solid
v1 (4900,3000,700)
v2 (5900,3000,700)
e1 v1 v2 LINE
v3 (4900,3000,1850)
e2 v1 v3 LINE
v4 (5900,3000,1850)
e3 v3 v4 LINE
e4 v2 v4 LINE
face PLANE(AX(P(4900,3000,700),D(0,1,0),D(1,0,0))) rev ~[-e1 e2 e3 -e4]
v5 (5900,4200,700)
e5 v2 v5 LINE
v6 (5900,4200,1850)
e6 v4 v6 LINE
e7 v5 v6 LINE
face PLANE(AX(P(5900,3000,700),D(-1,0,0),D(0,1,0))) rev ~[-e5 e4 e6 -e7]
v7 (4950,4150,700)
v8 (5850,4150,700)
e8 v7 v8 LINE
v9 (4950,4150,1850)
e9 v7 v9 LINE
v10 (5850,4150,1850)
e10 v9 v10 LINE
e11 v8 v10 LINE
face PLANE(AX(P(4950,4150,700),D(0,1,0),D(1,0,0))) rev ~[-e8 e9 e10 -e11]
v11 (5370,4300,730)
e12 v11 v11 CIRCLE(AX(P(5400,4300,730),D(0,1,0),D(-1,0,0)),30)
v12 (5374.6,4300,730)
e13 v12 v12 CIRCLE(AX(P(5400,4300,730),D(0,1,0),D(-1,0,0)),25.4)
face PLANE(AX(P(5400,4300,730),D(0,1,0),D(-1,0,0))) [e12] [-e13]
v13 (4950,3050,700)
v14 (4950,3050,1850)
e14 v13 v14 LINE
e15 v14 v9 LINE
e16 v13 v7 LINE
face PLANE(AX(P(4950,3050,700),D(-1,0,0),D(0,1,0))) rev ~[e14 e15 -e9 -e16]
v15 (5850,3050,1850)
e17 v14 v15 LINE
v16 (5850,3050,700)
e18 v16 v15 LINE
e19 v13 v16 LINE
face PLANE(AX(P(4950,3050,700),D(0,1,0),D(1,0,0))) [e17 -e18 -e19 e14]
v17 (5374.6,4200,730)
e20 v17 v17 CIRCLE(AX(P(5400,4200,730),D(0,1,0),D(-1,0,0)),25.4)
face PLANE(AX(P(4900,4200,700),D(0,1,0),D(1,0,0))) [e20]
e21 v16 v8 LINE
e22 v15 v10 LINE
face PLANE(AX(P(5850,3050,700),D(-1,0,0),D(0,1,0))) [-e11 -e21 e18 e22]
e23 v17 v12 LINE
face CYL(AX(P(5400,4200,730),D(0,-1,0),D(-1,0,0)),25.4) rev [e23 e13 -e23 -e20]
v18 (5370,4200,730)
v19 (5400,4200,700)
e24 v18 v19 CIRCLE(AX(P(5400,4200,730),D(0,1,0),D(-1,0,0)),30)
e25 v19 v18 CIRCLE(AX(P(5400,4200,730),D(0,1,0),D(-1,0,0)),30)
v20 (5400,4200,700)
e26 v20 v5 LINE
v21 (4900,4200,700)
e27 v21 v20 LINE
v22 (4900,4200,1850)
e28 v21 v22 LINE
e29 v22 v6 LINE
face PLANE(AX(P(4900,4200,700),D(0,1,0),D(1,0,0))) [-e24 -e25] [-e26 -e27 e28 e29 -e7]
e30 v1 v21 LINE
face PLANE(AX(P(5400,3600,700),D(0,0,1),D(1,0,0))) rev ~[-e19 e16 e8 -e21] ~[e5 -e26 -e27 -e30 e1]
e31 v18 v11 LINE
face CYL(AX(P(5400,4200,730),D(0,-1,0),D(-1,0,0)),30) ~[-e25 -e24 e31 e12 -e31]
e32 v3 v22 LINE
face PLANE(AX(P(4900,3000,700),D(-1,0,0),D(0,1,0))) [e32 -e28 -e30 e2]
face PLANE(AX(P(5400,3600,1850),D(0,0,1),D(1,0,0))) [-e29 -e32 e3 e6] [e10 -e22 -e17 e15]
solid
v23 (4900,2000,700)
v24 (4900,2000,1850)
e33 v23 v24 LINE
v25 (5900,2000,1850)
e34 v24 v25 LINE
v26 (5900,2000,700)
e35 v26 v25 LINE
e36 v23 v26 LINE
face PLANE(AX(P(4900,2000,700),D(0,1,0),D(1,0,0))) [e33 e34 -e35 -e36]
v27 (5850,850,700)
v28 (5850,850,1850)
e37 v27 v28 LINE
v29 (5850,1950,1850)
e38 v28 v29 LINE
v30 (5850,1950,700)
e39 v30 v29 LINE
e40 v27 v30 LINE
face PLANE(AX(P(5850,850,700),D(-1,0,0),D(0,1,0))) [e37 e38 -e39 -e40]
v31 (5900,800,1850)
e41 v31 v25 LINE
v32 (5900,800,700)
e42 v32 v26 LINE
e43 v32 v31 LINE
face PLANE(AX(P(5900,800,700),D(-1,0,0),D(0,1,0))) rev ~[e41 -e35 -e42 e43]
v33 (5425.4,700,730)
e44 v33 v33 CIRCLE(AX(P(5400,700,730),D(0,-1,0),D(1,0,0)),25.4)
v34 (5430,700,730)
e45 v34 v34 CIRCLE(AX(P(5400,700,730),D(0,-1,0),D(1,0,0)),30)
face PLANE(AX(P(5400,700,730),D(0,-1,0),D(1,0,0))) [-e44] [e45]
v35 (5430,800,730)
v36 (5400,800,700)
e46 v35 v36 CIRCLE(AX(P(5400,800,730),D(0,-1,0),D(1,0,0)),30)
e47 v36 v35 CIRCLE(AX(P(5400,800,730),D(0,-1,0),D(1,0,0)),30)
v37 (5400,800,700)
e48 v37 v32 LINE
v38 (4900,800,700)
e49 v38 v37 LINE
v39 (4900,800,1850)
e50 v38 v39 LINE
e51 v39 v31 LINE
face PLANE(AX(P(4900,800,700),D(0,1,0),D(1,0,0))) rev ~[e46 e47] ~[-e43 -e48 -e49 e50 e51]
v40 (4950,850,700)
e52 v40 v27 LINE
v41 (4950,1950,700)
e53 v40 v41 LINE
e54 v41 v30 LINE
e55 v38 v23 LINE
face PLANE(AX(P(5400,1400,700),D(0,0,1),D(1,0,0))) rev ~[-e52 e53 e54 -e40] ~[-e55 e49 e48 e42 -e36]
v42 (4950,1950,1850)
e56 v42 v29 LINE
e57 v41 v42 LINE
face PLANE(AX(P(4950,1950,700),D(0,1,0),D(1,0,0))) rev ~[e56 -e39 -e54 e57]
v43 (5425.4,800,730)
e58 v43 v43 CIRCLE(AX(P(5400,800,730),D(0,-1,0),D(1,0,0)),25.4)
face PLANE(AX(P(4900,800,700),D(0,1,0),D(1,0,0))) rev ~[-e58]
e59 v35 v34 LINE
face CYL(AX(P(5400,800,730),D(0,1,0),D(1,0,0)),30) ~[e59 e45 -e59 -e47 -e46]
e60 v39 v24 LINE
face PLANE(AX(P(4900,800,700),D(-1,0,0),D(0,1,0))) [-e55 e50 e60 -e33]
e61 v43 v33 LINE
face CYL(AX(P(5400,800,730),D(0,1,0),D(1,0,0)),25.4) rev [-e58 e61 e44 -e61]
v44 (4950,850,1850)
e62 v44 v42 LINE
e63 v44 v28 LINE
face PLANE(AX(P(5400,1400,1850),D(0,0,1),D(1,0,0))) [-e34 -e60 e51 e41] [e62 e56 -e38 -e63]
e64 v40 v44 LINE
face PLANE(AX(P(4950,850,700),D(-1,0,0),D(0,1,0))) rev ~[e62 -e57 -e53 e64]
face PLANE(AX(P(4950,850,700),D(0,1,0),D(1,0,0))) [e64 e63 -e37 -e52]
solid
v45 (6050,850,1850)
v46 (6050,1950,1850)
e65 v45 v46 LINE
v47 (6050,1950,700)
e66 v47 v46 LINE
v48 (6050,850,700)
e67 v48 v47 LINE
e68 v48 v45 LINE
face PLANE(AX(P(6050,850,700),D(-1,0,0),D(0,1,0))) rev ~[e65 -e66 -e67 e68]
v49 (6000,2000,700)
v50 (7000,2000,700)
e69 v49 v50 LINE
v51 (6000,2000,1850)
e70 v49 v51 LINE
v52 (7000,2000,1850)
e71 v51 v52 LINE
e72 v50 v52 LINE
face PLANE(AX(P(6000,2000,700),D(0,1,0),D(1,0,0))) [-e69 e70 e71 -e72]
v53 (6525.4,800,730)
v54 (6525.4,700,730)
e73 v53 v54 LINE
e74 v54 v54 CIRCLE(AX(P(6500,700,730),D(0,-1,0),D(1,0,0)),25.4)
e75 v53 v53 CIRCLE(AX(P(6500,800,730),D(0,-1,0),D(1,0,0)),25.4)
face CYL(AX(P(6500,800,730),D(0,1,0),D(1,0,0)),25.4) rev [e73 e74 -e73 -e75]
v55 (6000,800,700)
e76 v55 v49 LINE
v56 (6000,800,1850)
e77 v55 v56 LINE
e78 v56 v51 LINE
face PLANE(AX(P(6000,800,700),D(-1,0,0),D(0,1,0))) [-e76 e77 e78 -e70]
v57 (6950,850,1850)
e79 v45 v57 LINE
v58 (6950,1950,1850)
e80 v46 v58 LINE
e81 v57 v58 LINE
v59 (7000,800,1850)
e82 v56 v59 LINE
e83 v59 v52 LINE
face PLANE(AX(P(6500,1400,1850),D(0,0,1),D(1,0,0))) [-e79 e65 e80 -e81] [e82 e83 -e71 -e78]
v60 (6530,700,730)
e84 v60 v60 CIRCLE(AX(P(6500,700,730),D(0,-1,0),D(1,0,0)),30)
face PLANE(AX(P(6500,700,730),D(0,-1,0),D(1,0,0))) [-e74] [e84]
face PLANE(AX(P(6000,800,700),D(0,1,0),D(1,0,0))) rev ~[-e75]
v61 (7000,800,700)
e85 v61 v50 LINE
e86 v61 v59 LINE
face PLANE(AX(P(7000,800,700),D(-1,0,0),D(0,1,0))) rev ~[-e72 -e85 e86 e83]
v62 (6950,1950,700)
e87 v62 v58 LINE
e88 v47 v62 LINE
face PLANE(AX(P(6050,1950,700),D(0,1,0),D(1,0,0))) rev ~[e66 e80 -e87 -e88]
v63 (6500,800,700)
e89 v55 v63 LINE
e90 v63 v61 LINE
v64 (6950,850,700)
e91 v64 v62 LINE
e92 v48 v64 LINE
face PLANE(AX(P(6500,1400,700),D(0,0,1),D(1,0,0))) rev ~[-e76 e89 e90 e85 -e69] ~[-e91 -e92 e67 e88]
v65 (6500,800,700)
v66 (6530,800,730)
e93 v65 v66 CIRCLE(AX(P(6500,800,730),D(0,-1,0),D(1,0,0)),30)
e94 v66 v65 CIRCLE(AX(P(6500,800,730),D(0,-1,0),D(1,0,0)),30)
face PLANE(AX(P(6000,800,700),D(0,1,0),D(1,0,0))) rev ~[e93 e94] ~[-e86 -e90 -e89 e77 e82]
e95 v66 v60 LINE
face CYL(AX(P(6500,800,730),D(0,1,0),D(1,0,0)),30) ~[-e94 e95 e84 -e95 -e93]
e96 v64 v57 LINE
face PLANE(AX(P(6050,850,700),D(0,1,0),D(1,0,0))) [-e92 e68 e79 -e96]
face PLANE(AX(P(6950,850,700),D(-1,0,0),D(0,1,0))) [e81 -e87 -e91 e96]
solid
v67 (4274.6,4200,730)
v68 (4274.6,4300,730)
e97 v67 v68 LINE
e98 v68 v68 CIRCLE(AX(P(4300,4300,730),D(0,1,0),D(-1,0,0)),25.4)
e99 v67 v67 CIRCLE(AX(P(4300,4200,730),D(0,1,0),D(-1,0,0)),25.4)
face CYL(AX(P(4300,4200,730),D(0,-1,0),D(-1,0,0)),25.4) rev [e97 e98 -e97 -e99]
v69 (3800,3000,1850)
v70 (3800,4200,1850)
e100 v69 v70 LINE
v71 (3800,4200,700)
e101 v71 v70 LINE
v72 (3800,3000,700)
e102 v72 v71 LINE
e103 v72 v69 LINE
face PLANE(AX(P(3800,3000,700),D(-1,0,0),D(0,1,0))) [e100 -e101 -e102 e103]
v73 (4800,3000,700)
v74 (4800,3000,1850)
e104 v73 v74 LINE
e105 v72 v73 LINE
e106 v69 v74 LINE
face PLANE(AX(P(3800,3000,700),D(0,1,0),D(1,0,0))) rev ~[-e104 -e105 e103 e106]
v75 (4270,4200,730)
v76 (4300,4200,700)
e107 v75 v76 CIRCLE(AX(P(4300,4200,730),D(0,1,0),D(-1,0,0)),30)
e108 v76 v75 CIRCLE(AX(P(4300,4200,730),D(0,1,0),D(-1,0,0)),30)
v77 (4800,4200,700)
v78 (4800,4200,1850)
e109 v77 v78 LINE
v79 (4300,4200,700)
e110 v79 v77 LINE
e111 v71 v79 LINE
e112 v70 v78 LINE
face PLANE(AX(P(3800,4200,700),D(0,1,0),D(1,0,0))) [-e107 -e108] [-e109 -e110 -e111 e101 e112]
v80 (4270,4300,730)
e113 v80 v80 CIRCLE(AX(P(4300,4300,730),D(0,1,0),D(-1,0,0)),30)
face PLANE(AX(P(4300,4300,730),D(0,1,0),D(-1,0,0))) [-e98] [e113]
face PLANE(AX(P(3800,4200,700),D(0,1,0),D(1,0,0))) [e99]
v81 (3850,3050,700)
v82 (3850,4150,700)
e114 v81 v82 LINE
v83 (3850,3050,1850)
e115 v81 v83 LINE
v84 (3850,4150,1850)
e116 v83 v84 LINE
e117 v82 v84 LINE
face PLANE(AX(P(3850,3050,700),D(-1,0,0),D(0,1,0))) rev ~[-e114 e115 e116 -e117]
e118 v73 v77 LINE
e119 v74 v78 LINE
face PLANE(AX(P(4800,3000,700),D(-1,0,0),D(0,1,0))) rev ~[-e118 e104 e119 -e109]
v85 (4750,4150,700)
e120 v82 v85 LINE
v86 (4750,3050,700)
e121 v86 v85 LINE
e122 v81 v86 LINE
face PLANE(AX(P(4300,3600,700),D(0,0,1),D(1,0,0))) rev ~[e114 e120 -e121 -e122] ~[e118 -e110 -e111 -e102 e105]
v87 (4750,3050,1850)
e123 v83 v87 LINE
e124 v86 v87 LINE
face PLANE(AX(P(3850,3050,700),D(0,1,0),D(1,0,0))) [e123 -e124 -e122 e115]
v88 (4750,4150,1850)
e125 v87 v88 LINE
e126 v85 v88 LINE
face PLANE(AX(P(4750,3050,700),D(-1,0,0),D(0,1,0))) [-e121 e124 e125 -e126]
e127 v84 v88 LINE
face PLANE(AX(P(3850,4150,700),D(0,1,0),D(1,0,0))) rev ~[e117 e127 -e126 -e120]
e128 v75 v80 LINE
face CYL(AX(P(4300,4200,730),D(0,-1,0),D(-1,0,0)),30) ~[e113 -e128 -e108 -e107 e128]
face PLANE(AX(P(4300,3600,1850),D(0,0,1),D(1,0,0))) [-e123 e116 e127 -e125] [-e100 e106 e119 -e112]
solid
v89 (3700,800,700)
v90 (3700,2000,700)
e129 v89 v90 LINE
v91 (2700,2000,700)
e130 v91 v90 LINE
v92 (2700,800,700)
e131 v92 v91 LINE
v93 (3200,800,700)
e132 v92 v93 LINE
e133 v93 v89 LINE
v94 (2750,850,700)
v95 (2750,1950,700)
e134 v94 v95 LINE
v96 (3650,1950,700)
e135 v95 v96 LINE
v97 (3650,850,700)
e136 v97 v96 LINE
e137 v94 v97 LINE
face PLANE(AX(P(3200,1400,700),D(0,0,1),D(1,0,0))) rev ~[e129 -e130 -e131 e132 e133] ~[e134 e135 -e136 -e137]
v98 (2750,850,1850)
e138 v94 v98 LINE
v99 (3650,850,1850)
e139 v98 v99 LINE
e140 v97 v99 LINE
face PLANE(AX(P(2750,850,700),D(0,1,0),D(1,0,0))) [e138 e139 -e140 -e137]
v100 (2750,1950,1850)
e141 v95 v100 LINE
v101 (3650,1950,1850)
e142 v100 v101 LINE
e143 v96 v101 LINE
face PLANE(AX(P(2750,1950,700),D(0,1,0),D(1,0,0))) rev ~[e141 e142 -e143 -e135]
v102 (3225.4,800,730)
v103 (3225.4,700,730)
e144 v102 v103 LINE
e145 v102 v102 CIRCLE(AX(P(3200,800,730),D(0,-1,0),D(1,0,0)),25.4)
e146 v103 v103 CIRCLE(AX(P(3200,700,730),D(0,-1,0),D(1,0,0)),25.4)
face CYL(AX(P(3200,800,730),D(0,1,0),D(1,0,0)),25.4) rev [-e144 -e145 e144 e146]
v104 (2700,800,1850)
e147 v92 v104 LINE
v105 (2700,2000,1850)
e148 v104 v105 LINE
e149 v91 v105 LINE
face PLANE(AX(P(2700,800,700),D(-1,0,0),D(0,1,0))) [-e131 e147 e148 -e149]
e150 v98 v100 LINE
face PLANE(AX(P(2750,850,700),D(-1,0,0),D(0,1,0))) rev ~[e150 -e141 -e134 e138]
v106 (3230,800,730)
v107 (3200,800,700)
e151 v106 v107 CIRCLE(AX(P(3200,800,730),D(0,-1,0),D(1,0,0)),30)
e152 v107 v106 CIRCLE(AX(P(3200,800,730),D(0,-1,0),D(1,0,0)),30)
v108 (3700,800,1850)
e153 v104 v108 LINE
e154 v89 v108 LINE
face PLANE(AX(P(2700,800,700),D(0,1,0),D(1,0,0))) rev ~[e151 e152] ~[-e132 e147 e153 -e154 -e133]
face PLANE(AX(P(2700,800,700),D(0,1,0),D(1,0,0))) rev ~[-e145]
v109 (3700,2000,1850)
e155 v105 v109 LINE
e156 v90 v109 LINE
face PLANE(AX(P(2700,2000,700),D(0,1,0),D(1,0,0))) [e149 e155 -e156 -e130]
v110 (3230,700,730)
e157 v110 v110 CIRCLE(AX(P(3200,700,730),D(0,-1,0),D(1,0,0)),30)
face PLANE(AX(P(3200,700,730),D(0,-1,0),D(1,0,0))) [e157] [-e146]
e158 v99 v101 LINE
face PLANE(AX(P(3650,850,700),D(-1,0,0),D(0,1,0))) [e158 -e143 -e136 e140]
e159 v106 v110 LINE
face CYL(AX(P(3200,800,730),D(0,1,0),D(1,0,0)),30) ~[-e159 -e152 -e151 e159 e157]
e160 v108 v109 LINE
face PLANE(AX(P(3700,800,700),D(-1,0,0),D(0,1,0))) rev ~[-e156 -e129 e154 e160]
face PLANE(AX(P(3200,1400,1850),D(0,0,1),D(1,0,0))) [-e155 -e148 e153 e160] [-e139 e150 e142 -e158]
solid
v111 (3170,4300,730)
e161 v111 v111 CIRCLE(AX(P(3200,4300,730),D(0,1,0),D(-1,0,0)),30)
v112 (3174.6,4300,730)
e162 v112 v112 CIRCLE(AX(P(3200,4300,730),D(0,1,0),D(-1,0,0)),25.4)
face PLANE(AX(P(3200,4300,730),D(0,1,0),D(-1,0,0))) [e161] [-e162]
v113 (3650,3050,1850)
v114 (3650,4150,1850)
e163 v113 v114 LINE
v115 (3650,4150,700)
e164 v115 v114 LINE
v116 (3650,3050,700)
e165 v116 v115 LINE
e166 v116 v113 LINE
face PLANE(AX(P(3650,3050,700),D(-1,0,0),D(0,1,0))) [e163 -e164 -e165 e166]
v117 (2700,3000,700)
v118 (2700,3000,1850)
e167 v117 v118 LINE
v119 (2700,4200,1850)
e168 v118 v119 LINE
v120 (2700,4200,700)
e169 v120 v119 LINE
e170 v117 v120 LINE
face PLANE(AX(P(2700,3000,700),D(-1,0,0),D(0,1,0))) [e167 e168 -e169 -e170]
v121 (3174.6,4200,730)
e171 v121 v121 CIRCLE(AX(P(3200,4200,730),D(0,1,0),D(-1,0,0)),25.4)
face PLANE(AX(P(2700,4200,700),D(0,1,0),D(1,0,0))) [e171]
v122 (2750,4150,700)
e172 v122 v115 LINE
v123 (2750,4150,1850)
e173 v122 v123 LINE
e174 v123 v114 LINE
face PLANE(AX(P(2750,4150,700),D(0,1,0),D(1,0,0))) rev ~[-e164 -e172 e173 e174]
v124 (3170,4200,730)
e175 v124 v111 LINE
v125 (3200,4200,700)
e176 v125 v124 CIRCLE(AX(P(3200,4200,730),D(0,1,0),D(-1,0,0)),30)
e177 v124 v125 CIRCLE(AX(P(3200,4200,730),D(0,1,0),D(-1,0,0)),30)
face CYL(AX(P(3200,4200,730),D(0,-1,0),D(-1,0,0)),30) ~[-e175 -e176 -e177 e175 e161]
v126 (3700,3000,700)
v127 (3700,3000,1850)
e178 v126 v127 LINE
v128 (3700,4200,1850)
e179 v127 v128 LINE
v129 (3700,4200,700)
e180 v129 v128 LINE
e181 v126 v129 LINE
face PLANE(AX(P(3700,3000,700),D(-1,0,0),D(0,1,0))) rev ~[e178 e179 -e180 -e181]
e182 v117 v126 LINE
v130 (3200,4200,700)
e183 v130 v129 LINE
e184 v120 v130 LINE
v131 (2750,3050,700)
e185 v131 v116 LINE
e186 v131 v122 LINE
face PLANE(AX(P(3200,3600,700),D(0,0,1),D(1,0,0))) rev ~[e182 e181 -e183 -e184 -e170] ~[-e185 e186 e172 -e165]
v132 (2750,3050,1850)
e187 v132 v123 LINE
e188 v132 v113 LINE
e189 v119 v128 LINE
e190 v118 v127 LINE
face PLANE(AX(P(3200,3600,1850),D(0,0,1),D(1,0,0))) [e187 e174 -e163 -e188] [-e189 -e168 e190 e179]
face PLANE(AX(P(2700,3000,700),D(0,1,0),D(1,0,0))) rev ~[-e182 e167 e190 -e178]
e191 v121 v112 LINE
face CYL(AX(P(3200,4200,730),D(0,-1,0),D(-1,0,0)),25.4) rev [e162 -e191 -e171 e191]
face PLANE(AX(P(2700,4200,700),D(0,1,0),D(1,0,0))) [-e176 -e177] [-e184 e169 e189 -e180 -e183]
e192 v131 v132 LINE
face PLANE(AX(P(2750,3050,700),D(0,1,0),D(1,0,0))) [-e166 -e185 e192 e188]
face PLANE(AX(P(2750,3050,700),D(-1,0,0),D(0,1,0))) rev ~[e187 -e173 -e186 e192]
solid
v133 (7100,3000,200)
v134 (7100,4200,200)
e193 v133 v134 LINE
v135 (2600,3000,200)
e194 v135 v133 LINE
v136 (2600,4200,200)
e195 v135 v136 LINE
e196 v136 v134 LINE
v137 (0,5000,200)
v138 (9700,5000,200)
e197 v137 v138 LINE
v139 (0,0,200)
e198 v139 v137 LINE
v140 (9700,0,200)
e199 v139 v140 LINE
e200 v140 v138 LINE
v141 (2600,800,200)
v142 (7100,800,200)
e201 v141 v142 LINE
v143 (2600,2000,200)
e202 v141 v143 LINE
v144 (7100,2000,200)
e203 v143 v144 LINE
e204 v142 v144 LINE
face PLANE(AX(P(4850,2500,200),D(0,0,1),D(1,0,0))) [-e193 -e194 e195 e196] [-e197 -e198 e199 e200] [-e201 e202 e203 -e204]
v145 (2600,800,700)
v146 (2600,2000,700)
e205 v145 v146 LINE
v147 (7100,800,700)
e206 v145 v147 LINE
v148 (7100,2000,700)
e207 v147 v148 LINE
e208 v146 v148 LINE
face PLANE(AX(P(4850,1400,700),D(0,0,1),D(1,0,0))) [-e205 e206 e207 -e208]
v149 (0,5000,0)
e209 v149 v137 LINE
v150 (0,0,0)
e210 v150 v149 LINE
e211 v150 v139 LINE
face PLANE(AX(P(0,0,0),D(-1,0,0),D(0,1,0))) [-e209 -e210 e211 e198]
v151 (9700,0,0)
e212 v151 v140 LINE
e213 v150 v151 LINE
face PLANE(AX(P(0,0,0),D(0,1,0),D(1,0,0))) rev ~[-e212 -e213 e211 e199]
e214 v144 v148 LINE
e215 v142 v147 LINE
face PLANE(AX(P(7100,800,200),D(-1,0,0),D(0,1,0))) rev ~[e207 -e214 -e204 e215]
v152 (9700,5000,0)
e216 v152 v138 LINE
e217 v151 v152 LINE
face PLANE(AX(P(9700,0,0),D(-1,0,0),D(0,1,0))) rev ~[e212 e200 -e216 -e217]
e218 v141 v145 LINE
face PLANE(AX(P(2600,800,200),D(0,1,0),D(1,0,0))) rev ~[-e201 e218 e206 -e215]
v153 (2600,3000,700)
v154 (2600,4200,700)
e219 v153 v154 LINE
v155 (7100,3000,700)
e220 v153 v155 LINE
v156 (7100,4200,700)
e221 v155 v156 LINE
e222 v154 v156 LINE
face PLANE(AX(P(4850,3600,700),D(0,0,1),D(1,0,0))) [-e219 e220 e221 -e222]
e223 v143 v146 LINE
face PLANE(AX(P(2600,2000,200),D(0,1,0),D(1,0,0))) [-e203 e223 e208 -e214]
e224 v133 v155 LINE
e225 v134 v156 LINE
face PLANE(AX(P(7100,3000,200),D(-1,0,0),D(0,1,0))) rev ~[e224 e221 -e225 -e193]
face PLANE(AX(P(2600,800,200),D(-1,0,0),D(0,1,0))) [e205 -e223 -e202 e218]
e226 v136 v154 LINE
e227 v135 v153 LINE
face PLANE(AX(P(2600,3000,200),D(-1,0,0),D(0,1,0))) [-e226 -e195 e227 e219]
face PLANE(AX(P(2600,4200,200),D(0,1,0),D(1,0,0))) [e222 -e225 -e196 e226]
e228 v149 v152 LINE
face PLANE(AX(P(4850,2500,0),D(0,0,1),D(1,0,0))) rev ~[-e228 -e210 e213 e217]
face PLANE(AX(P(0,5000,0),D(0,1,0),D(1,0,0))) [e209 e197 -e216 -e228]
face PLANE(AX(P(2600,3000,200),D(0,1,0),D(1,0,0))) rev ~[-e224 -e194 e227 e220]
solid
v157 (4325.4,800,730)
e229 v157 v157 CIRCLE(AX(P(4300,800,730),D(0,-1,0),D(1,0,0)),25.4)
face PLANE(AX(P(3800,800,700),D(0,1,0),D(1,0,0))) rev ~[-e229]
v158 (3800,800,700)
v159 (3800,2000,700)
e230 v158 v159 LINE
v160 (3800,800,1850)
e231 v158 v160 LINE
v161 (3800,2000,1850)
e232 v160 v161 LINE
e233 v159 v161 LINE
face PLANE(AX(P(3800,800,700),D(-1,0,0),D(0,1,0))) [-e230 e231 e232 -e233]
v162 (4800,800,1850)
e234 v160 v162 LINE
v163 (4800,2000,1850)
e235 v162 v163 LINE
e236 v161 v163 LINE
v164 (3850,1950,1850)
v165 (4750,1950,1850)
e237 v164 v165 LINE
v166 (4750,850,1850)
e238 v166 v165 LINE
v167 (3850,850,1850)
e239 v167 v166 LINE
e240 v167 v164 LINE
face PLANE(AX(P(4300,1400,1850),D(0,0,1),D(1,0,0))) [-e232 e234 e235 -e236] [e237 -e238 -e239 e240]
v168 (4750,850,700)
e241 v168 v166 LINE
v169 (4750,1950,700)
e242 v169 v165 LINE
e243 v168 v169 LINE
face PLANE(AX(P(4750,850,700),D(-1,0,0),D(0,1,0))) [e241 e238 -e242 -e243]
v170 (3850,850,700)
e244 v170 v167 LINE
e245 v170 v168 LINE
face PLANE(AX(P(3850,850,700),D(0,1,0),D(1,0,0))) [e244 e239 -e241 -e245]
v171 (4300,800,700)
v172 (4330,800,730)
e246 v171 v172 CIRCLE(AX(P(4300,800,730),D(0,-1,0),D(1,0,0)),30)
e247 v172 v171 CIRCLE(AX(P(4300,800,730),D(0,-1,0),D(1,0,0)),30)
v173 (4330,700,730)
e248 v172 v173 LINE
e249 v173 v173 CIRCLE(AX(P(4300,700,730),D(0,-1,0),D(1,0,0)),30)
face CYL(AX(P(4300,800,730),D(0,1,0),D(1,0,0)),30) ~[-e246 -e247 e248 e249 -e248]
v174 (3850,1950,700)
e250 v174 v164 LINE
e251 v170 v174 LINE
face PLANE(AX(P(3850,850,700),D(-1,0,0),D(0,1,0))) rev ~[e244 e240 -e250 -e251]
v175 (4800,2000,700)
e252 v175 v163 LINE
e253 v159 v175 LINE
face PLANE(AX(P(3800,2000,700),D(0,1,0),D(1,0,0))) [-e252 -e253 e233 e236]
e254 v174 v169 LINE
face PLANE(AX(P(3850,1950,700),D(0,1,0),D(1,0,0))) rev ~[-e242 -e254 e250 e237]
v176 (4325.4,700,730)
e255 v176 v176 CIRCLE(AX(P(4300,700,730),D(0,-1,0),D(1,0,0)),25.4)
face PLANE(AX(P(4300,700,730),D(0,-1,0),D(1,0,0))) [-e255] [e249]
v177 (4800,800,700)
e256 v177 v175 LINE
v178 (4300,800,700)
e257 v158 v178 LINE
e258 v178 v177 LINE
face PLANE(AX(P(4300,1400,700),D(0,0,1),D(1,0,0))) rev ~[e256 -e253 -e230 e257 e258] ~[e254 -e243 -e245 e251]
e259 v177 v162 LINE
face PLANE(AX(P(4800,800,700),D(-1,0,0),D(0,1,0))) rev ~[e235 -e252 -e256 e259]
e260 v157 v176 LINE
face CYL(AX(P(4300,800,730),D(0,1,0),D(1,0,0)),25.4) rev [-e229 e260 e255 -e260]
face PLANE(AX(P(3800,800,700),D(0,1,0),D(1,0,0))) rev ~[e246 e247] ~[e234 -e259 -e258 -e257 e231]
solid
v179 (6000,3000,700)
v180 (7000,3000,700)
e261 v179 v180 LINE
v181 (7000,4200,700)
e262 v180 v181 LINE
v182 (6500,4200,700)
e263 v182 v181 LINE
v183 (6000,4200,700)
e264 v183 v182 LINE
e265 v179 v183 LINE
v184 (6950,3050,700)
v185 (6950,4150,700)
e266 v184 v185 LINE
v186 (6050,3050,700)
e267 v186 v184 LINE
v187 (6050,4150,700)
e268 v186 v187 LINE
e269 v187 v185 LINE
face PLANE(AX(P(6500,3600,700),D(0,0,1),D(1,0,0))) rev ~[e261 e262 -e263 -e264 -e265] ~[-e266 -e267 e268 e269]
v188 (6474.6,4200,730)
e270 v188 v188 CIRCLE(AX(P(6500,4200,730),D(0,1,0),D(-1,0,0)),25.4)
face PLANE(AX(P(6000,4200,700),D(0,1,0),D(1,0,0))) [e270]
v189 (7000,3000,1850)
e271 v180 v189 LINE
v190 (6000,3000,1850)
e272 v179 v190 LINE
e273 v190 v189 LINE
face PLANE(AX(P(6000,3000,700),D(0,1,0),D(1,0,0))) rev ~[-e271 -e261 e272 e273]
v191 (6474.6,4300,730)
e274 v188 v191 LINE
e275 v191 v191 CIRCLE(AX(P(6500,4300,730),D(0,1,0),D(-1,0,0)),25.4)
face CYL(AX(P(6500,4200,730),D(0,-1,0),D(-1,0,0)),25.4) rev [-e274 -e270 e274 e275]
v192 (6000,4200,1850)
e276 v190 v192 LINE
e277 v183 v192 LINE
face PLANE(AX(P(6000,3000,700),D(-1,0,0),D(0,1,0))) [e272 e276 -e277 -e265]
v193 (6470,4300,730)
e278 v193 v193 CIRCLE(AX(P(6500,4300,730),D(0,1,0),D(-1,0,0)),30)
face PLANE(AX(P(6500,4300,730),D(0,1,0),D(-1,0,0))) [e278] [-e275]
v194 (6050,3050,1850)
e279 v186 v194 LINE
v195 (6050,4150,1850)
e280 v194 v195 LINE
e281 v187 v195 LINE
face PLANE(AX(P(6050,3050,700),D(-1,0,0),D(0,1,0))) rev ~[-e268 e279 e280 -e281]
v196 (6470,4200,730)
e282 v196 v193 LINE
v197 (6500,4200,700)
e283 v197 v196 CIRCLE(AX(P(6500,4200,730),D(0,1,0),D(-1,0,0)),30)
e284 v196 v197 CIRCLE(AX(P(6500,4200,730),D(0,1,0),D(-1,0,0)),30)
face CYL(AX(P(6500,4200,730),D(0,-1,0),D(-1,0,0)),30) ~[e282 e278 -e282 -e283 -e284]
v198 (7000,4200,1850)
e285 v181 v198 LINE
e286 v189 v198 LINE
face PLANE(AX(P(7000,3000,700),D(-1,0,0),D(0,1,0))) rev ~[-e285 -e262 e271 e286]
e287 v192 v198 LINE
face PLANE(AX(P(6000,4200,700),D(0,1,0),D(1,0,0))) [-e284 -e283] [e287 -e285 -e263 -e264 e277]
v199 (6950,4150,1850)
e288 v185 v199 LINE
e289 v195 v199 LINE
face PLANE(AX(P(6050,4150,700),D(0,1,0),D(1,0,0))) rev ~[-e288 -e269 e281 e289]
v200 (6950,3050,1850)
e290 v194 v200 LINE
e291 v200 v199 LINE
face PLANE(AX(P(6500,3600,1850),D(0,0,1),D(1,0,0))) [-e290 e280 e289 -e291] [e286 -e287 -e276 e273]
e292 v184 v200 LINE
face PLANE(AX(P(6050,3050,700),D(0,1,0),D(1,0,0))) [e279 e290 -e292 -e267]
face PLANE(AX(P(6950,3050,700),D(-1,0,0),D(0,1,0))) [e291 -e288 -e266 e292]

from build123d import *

# Parameters (mm, degrees)
F0_W     = 9700
F0_H     = 5000
F1_DEPTH = 200
F2_W     = 4500
F2_H     = 1200
F3_DEPTH = 500
F4_W     = 1000
F4_H     = 1200
F4_W_2   = 900
F4_H_2   = 1100
F5_DEPTH = 1150
F6_R     = 30
F6_R_2   = 25.4
F7_DEPTH = 100
F8_R     = 30
F8_R_2   = 25.4
F9_DEPTH = 100


with BuildPart() as f1:
    # F0 (on Top) → F1 (new body)
    with BuildSketch(Plane.XY):
        with Locations((4850, 2500)):
            Rectangle(F0_W, F0_H)
    extrude(amount=F1_DEPTH)

    # F2 (on face) → F3 (join)
    with BuildSketch(Plane.XY.offset(200)):
        with Locations((4850, 1400)):
            Rectangle(F2_W, F2_H)
        with Locations((4850, 3600)):
            Rectangle(F2_W, F2_H)
    extrude(amount=F3_DEPTH)


with BuildPart() as f5:
    # F4 (on face) → F5 (new body)
    with BuildSketch(Plane.XY.offset(700)):
        with Locations((3200, 3600)):
            Rectangle(F4_W, F4_H)
        with Locations((3200, 3600)):
            Rectangle(F4_W_2, F4_H_2, mode=Mode.SUBTRACT)
    extrude(amount=F5_DEPTH)

    # F8 (on face) → F9, piece 4 (join)
    with BuildSketch(Plane(origin=(0, 4200, 0), x_dir=(-1, 0, 0), z_dir=(0, 1, 0))):
        with Locations((-3200, 730)):
            Circle(F8_R)
        with Locations((-3200, 730)):
            Circle(F8_R_2, mode=Mode.SUBTRACT)
    extrude(amount=F9_DEPTH)


with BuildPart() as f5b:
    # F4 (on face) → F5, piece 2 (new body)
    with BuildSketch(Plane.XY.offset(700)):
        with Locations((4300, 3600)):
            Rectangle(F4_W, F4_H)
        with Locations((4300, 3600)):
            Rectangle(F4_W_2, F4_H_2, mode=Mode.SUBTRACT)
    extrude(amount=F5_DEPTH)

    # F8 (on face) → F9, piece 3 (join)
    with BuildSketch(Plane(origin=(0, 4200, 0), x_dir=(-1, 0, 0), z_dir=(0, 1, 0))):
        with Locations((-4300, 730)):
            Circle(F8_R)
        with Locations((-4300, 730)):
            Circle(F8_R_2, mode=Mode.SUBTRACT)
    extrude(amount=F9_DEPTH)


with BuildPart() as f5c:
    # F4 (on face) → F5, piece 3 (new body)
    with BuildSketch(Plane.XY.offset(700)):
        with Locations((5400, 3600)):
            Rectangle(F4_W, F4_H)
        with Locations((5400, 3600)):
            Rectangle(F4_W_2, F4_H_2, mode=Mode.SUBTRACT)
    extrude(amount=F5_DEPTH)

    # F8 (on face) → F9, piece 2 (join)
    with BuildSketch(Plane(origin=(0, 4200, 0), x_dir=(-1, 0, 0), z_dir=(0, 1, 0))):
        with Locations((-5400, 730)):
            Circle(F8_R)
        with Locations((-5400, 730)):
            Circle(F8_R_2, mode=Mode.SUBTRACT)
    extrude(amount=F9_DEPTH)


with BuildPart() as f5d:
    # F4 (on face) → F5, piece 4 (new body)
    with BuildSketch(Plane.XY.offset(700)):
        with Locations((6500, 3600)):
            Rectangle(F4_W, F4_H)
        with Locations((6500, 3600)):
            Rectangle(F4_W_2, F4_H_2, mode=Mode.SUBTRACT)
    extrude(amount=F5_DEPTH)

    # F8 (on face) → F9 (join)
    with BuildSketch(Plane(origin=(0, 4200, 0), x_dir=(-1, 0, 0), z_dir=(0, 1, 0))):
        with Locations((-6500, 730)):
            Circle(F8_R)
        with Locations((-6500, 730)):
            Circle(F8_R_2, mode=Mode.SUBTRACT)
    extrude(amount=F9_DEPTH)


with BuildPart() as f5e:
    # F4 (on face) → F5, piece 5 (new body)
    with BuildSketch(Plane.XY.offset(700)):
        with Locations((4300, 1400)):
            Rectangle(F4_W, F4_H)
        with Locations((4300, 1400)):
            Rectangle(F4_W_2, F4_H_2, mode=Mode.SUBTRACT)
    extrude(amount=F5_DEPTH)

    # F6 (on face) → F7, piece 2 (join)
    with BuildSketch(Plane.XZ.offset(-800)):
        with Locations((4300, 730)):
            Circle(F6_R)
        with Locations((4300, 730)):
            Circle(F6_R_2, mode=Mode.SUBTRACT)
    extrude(amount=F7_DEPTH)


with BuildPart() as f5f:
    # F4 (on face) → F5, piece 6 (new body)
    with BuildSketch(Plane.XY.offset(700)):
        with Locations((6500, 1400)):
            Rectangle(F4_W, F4_H)
        with Locations((6500, 1400)):
            Rectangle(F4_W_2, F4_H_2, mode=Mode.SUBTRACT)
    extrude(amount=F5_DEPTH)

    # F6 (on face) → F7, piece 4 (join)
    with BuildSketch(Plane.XZ.offset(-800)):
        with Locations((6500, 730)):
            Circle(F6_R)
        with Locations((6500, 730)):
            Circle(F6_R_2, mode=Mode.SUBTRACT)
    extrude(amount=F7_DEPTH)


with BuildPart() as f5g:
    # F4 (on face) → F5, piece 7 (new body)
    with BuildSketch(Plane.XY.offset(700)):
        with Locations((3200, 1400)):
            Rectangle(F4_W, F4_H)
        with Locations((3200, 1400)):
            Rectangle(F4_W_2, F4_H_2, mode=Mode.SUBTRACT)
    extrude(amount=F5_DEPTH)

    # F6 (on face) → F7 (join)
    with BuildSketch(Plane.XZ.offset(-800)):
        with Locations((3200, 730)):
            Circle(F6_R)
        with Locations((3200, 730)):
            Circle(F6_R_2, mode=Mode.SUBTRACT)
    extrude(amount=F7_DEPTH)


with BuildPart() as f5h:
    # F4 (on face) → F5, piece 8 (new body)
    with BuildSketch(Plane.XY.offset(700)):
        with Locations((5400, 1400)):
            Rectangle(F4_W, F4_H)
        with Locations((5400, 1400)):
            Rectangle(F4_W_2, F4_H_2, mode=Mode.SUBTRACT)
    extrude(amount=F5_DEPTH)

    # F6 (on face) → F7, piece 3 (join)
    with BuildSketch(Plane.XZ.offset(-800)):
        with Locations((5400, 730)):
            Circle(F6_R)
        with Locations((5400, 730)):
            Circle(F6_R_2, mode=Mode.SUBTRACT)
    extrude(amount=F7_DEPTH)


solid = Compound([f1.part, f5.part, f5b.part, f5c.part, f5d.part, f5e.part, f5f.part, f5g.part, f5h.part])
